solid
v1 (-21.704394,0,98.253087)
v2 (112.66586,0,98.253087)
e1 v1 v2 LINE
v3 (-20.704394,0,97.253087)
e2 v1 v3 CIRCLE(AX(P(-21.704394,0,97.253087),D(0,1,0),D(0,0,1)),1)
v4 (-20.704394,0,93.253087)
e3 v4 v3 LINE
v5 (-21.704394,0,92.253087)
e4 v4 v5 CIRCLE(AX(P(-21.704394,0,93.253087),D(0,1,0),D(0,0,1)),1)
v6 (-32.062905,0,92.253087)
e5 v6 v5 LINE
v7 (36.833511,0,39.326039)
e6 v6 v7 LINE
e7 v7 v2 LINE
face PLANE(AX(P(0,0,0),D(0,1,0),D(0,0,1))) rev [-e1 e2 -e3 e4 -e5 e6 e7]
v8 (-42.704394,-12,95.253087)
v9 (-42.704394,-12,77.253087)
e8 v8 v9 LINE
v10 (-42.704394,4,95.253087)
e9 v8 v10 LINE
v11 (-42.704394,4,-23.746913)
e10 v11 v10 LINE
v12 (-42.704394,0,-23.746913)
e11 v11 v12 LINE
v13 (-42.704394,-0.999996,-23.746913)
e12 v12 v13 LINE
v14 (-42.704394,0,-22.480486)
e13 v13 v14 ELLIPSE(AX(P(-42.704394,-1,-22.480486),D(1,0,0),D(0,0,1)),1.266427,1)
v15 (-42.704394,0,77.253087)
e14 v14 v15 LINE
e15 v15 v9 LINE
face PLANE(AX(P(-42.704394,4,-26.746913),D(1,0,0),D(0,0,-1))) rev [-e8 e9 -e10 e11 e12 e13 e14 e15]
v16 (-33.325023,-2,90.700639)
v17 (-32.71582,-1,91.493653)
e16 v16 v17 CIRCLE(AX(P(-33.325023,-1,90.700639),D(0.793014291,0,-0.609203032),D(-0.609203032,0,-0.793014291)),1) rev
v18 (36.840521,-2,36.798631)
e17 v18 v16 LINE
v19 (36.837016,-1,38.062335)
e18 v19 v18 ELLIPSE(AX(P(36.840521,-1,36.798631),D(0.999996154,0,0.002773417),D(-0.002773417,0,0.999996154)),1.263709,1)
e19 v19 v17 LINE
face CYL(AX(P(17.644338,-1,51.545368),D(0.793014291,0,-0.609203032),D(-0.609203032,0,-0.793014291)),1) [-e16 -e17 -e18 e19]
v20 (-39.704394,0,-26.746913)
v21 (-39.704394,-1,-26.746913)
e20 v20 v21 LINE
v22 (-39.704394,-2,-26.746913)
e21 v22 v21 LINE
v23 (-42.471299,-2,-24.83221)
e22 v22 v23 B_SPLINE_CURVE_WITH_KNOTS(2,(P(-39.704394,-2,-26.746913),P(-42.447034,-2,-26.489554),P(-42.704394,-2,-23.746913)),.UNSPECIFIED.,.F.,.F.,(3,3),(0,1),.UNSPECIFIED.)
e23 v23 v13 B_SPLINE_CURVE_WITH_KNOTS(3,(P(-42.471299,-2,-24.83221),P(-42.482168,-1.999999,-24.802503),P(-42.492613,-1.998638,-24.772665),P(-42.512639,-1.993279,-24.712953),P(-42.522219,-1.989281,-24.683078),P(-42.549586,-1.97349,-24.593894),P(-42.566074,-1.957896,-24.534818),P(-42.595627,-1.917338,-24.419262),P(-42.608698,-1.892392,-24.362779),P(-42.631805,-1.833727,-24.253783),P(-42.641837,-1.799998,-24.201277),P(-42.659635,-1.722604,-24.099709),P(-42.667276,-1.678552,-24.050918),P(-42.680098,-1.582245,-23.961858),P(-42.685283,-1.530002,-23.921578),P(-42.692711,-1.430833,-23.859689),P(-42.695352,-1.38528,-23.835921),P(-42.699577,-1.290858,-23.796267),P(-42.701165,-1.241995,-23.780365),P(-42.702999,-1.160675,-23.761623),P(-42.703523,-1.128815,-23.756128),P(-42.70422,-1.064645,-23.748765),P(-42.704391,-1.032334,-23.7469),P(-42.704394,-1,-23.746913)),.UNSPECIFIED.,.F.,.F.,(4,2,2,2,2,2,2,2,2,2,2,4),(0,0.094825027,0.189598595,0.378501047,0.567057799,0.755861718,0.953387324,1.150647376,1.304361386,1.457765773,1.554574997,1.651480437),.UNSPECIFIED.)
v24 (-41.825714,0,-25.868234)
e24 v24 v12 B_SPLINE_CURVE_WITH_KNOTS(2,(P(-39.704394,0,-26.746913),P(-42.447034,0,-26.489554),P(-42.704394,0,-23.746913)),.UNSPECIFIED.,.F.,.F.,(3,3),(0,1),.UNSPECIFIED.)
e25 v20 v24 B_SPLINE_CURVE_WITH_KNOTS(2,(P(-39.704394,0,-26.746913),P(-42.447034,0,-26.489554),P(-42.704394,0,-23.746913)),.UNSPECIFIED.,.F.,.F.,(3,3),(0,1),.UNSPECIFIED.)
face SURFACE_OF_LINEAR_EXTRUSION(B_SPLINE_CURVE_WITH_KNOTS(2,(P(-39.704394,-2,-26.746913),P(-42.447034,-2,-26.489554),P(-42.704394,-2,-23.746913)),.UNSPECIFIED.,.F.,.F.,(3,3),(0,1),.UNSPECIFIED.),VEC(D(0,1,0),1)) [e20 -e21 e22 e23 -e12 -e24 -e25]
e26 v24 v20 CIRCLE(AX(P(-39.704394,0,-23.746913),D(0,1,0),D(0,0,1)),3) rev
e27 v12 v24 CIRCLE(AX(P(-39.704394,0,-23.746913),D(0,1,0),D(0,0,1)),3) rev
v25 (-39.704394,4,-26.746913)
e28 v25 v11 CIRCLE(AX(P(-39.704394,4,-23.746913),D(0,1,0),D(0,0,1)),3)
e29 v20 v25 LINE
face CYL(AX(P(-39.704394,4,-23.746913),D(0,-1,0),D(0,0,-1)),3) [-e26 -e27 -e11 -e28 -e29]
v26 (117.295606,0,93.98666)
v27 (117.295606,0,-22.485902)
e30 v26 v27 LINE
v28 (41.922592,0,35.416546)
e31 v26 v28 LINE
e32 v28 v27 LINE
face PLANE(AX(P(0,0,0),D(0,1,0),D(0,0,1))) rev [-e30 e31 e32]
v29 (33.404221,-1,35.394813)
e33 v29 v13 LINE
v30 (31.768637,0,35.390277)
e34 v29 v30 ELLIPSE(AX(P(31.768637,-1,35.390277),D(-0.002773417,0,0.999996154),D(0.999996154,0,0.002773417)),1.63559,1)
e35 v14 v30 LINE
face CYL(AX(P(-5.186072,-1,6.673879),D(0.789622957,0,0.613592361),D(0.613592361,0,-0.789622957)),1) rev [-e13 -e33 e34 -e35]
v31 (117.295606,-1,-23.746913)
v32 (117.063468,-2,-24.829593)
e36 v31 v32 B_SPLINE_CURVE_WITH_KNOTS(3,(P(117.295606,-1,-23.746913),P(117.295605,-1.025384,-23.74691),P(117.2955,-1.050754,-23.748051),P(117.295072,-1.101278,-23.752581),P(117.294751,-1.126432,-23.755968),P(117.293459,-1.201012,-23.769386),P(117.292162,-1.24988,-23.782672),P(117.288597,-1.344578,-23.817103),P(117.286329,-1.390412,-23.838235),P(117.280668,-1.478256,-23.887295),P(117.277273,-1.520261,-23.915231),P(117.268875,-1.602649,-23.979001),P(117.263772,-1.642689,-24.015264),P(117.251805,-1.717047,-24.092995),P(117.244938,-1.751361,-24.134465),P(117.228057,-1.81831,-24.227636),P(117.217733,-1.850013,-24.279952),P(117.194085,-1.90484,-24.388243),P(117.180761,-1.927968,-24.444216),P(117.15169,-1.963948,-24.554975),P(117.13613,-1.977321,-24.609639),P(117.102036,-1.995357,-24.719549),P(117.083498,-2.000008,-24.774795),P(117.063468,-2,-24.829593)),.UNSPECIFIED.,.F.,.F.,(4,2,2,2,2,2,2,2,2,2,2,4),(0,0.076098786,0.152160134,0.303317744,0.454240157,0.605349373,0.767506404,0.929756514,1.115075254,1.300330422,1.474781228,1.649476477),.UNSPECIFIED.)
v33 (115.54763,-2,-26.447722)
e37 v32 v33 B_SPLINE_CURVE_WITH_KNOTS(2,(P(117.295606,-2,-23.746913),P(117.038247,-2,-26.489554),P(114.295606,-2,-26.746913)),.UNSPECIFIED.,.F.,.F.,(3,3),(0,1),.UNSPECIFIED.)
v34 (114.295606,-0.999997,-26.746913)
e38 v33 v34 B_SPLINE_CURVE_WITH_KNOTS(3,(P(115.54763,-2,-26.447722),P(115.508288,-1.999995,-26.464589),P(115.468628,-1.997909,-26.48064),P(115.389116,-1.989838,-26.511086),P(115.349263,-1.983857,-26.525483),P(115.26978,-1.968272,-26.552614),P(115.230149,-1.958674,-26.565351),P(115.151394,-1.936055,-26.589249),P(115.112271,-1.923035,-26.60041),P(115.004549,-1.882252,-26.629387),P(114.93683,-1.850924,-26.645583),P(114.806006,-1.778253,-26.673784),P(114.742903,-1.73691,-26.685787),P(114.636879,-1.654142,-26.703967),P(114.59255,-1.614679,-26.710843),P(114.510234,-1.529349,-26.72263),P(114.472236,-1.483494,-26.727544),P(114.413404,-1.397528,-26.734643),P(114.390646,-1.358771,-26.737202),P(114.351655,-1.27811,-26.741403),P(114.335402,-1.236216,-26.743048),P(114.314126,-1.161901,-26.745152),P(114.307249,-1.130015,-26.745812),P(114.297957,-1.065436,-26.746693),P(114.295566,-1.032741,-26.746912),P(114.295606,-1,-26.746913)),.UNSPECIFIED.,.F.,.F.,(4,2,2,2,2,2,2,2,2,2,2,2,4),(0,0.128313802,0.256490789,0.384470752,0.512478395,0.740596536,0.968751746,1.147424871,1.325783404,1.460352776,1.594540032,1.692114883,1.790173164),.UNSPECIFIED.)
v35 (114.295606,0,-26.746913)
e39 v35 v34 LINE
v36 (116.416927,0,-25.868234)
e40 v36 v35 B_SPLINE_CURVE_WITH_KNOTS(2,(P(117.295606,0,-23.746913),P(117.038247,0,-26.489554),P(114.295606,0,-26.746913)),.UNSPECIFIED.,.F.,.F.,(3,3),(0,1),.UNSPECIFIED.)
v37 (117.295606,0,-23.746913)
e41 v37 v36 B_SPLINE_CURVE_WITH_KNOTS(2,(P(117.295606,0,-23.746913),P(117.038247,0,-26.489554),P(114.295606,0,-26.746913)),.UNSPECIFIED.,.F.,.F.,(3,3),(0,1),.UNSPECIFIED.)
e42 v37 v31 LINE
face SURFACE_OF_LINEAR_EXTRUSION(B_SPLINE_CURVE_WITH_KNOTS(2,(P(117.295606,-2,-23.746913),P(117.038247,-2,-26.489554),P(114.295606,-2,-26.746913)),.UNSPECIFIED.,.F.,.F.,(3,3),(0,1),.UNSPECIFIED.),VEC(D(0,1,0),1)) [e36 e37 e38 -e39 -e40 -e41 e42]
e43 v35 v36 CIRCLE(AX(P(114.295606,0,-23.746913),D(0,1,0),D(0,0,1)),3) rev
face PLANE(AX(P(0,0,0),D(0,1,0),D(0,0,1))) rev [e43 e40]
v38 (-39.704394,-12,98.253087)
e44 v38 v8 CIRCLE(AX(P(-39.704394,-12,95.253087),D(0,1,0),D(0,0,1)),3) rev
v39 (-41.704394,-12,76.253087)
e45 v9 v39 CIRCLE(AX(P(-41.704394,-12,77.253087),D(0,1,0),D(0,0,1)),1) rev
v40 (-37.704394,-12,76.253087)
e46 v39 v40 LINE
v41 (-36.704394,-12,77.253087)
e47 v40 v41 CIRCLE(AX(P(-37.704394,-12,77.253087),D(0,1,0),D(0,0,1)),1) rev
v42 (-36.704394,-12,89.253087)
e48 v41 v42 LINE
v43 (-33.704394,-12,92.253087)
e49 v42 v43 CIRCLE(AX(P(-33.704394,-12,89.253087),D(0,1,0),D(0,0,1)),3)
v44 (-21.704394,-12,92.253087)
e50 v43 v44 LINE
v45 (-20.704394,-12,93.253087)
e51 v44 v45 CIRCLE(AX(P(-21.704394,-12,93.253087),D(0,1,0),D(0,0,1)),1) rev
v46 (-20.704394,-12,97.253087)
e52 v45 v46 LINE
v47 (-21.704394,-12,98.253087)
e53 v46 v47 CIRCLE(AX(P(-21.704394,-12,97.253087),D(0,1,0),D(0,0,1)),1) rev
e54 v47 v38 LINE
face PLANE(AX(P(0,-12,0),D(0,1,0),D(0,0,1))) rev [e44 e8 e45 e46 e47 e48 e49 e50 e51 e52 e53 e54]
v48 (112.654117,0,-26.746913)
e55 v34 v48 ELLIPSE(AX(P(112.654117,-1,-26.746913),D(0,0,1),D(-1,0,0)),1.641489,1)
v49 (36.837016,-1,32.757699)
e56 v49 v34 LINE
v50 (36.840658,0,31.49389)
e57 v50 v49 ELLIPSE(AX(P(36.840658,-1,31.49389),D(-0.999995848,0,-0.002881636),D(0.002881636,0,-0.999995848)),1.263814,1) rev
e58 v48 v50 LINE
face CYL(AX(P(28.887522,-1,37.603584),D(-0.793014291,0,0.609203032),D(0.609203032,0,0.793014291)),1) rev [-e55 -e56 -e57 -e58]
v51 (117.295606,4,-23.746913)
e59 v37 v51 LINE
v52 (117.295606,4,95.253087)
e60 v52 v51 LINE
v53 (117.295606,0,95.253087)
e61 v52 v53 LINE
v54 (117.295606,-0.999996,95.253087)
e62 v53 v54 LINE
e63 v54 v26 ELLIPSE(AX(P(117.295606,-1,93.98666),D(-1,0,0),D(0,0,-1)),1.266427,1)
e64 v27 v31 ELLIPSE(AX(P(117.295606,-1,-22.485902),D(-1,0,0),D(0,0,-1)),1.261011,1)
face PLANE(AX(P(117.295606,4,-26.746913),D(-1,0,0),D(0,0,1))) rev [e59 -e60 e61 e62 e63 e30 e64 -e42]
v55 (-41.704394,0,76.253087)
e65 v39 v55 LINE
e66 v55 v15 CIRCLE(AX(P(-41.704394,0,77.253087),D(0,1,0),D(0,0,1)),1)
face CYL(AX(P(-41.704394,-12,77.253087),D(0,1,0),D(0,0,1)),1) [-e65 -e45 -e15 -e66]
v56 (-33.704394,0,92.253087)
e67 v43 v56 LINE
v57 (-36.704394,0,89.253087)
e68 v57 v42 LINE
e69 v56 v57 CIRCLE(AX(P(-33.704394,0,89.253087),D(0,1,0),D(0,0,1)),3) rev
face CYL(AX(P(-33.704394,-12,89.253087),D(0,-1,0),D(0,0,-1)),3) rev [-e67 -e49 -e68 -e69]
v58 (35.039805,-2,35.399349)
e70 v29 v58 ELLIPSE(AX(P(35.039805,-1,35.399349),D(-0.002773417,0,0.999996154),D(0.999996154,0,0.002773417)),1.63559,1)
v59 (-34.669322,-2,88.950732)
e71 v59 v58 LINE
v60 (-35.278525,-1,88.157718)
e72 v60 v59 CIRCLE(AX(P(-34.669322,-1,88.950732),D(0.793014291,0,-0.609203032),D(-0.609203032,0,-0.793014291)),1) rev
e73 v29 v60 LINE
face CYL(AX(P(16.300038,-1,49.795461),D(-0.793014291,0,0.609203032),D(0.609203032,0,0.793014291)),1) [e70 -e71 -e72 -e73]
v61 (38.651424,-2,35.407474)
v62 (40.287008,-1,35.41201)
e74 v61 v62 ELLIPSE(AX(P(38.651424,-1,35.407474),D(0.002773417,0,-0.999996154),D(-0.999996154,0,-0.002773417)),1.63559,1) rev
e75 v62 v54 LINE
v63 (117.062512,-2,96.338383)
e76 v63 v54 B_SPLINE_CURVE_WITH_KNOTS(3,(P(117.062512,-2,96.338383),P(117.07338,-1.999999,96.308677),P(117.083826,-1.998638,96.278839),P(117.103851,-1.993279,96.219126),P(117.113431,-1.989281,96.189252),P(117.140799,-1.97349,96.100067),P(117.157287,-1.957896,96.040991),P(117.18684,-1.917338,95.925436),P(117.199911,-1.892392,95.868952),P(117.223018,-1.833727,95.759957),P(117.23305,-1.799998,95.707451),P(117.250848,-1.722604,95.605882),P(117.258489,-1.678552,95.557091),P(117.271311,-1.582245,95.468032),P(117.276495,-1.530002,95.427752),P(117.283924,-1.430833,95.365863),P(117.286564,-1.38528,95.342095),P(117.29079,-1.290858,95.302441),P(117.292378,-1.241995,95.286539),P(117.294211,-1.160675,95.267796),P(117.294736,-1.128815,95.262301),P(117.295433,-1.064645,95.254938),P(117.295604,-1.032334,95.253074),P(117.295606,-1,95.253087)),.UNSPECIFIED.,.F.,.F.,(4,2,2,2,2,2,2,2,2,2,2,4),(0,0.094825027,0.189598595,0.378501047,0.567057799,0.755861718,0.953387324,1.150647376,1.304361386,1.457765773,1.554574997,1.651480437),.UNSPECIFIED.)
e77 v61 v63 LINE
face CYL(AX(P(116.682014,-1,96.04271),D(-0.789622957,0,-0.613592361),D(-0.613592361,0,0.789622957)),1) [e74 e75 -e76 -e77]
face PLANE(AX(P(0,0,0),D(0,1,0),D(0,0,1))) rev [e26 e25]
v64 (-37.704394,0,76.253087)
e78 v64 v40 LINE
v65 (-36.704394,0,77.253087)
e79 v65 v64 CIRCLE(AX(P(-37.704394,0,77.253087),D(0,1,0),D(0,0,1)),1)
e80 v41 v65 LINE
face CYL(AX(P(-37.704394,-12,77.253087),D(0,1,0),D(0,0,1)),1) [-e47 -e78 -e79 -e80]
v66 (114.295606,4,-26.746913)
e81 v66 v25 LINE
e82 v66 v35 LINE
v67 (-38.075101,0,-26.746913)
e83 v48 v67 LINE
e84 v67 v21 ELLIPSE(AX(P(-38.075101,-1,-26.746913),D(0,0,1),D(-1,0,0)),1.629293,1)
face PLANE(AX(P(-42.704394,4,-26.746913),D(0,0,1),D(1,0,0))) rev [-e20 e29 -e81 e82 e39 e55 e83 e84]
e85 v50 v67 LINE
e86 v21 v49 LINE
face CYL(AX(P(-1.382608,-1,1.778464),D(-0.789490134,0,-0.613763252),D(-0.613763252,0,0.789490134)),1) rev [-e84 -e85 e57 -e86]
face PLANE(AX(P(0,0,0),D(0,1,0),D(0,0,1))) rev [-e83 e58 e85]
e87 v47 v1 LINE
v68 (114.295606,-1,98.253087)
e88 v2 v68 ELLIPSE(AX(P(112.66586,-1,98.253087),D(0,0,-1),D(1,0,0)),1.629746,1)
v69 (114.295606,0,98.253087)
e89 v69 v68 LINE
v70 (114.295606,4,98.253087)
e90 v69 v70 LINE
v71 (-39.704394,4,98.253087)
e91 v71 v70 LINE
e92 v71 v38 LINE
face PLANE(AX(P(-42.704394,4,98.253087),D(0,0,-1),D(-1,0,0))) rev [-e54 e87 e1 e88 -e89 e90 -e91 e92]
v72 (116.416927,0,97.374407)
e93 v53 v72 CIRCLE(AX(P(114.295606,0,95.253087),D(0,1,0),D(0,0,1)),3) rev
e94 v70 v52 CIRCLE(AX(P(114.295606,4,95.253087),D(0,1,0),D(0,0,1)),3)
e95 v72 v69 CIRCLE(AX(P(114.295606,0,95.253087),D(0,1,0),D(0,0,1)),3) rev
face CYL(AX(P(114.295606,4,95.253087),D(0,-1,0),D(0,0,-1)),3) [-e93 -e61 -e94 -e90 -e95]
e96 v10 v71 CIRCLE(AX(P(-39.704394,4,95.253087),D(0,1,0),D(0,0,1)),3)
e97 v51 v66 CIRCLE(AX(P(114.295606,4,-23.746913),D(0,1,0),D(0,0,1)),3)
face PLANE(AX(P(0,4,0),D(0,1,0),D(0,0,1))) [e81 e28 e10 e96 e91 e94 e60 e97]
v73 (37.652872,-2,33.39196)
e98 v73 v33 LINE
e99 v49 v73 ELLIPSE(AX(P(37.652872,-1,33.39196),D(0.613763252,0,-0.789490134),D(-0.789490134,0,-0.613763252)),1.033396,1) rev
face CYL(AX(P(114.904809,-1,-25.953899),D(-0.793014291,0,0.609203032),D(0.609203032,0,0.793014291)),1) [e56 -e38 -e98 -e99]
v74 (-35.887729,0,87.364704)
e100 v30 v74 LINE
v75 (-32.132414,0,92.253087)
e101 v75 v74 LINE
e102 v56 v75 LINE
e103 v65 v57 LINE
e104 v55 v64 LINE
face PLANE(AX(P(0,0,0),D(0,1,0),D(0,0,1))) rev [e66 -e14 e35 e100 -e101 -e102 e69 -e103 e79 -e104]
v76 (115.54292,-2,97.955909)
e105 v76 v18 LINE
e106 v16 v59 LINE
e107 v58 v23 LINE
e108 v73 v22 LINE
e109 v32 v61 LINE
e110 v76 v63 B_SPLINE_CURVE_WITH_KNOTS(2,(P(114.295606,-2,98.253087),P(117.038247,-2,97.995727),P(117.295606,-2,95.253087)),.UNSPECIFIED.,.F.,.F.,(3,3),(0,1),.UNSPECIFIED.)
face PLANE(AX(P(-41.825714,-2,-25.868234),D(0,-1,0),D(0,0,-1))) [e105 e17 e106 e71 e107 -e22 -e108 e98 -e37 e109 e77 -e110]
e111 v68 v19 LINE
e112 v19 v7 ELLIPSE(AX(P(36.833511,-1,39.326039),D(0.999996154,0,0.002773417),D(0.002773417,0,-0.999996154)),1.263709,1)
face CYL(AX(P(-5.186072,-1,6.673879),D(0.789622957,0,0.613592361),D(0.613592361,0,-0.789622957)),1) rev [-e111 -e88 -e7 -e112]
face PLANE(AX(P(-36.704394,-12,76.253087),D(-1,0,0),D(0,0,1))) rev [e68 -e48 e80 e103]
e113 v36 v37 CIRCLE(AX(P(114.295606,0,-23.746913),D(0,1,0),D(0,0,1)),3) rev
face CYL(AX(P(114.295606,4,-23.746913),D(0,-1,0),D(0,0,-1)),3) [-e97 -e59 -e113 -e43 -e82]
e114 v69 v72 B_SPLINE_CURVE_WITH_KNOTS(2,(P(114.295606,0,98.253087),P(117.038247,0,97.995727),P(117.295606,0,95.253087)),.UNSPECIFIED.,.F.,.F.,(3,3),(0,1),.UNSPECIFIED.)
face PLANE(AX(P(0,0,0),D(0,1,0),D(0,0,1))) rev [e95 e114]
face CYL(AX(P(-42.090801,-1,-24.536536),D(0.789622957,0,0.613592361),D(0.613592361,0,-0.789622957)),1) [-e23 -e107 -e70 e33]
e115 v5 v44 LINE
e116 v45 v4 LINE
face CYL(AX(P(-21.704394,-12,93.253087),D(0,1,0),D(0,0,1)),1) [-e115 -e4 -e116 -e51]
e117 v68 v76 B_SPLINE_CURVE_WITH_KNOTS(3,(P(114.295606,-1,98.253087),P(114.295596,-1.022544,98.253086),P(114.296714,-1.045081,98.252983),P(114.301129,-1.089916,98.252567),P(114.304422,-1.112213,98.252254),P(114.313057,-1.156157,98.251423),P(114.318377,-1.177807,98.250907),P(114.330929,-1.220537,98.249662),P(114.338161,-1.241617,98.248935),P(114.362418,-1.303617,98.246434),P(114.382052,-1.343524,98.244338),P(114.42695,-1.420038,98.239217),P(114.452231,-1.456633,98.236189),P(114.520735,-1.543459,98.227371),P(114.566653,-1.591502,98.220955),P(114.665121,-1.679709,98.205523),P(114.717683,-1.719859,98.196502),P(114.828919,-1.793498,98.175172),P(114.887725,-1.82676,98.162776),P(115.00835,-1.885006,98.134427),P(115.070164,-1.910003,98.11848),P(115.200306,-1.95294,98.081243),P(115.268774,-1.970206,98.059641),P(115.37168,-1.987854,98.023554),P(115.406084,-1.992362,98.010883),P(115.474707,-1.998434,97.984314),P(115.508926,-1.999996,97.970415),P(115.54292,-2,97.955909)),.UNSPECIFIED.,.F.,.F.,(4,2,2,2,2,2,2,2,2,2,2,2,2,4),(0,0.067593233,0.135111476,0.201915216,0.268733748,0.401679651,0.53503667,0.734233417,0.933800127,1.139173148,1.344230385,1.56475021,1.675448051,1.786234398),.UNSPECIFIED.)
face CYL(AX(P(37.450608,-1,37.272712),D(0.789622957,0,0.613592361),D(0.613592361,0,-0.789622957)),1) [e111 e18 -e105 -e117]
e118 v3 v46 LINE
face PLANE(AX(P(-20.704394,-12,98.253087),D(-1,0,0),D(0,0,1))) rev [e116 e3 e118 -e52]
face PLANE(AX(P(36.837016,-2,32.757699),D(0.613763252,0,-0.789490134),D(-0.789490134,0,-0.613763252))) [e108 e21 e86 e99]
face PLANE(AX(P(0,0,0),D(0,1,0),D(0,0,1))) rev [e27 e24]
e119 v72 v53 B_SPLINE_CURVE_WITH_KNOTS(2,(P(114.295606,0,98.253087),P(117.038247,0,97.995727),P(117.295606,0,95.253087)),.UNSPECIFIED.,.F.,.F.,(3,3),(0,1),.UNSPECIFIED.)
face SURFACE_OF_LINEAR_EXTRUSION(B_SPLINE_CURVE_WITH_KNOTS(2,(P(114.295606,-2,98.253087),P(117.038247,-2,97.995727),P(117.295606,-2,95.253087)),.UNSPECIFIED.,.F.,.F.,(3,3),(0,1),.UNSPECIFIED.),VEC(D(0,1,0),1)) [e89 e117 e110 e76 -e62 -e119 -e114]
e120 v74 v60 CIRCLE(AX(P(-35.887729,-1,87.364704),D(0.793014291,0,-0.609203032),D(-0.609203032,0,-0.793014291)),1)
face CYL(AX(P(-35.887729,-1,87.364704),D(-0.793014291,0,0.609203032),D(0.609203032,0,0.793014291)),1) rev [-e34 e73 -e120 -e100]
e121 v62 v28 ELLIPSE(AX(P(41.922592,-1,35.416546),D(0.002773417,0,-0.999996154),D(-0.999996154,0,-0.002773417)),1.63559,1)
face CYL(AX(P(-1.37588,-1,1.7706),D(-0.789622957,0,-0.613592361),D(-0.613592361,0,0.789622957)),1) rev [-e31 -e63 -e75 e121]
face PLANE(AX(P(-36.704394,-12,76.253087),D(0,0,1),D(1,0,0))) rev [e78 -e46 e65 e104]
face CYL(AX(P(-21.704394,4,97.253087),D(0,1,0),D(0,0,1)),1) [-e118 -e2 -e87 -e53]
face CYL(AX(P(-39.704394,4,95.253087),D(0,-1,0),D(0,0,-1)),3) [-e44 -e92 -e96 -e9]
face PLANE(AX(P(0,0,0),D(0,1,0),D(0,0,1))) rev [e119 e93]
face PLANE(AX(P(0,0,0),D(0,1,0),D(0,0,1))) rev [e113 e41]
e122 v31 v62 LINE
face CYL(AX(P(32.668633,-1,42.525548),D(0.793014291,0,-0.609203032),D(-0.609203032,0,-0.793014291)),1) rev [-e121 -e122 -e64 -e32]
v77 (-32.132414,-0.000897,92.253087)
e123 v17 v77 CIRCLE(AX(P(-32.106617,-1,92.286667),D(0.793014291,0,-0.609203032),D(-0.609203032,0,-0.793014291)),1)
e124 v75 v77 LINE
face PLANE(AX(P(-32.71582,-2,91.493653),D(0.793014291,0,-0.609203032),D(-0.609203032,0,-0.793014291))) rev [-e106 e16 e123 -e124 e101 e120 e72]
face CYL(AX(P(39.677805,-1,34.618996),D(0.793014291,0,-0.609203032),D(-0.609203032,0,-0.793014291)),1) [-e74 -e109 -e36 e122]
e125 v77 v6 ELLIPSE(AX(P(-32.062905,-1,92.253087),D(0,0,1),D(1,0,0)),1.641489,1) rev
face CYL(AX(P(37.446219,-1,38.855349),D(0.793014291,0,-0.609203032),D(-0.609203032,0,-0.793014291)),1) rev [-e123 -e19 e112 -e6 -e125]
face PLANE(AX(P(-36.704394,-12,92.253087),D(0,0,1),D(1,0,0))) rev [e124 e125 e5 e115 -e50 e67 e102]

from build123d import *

# Parameters (mm, degrees)
SKETCH_1_W       = 160
SKETCH_1_H       = 125
EXTRUDE_1_DEPTH  = 4
EXTRUDE_2_DEPTH  = 12
FILLET_7_R       = 1
FILLET_8_R       = 1
FILLET_9_R       = 3
FILLET_10_R      = 1
FILLET_11_R      = 1
FILLET_12_R      = 3
FILLET_13_R      = 3
EXTRUDE_10_DEPTH = 2
FILLET_14_R      = 1
FILLET_15_R      = 1
FILLET_16_R      = 1


# Some blends are built 0.0001 mm under size
with BuildPart() as part:
    # 草图1 → 凸台-拉伸1 (new body)
    with BuildSketch(Plane(origin=(0, 0, 0), x_dir=(1, 0, 0), z_dir=(0, 1, 0))):
        with Locations((37.295606337, -35.753086772)):
            Rectangle(SKETCH_1_W, SKETCH_1_H)
    extrude(amount=EXTRUDE_1_DEPTH)

    # 草图4 → 凸台-拉伸2 (add)
    with BuildSketch(Plane.XZ):
        Polygon((-42.704393663, 98.253086772), (-20.704393663, 98.253086772), (-20.704393663, 92.253086772), (-36.704393663, 92.253086772), (-36.704393663, 76.253086772), (-42.704393663, 76.253086772), align=None)
    extrude(amount=EXTRUDE_2_DEPTH)

    # 圆角7
    fillet_7_edges = [part.edges().sort_by_distance(p)[0] for p in [
        (-36.704393663, -6, 76.253086772),
    ]]
    fillet(fillet_7_edges, radius=FILLET_7_R)

    # 圆角8
    fillet_8_edges = [part.edges().sort_by_distance(p)[0] for p in [
        (-20.704393663, -6, 92.253086772),
    ]]
    fillet(fillet_8_edges, radius=FILLET_8_R)

    # 圆角9
    fillet_9_edges = [part.edges().sort_by_distance(p)[0] for p in [
        (-36.704393663, -6, 92.253086772),
    ]]
    fillet(fillet_9_edges, radius=FILLET_9_R)

    # 圆角10
    fillet_10_edges = [part.edges().sort_by_distance(p)[0] for p in [
        (-42.704393663, -6, 76.253086772),
    ]]
    fillet(fillet_10_edges, radius=FILLET_10_R)

    # 圆角11
    fillet_11_edges = [part.edges().sort_by_distance(p)[0] for p in [
        (-20.704393663, -6, 98.253086772),
    ]]
    fillet(fillet_11_edges, radius=FILLET_11_R)

    # 圆角12
    fillet_12_edges = [part.edges().sort_by_distance(p)[0] for p in [
        (-42.704393663, -4, 98.253086772),
    ]]
    fillet(fillet_12_edges, radius=FILLET_12_R)

    # 圆角13
    fillet_13_edges = [part.edges().sort_by_distance(p)[0] for p in [
        (-42.704393663, 2, -26.746913228),
        (117.295606337, 2, -26.746913228),
        (117.295606337, 2, 98.253086772),
    ]]
    fillet(fillet_13_edges, radius=FILLET_13_R)

    # 草图5 → 凸台-拉伸10 (add)
    with BuildSketch(Plane(origin=(0, 0, 0), x_dir=(-1, 0, 0), z_dir=(0, -1, 0))):
        with BuildLine():
            Line((-36.837015956, -38.062335011), (-114.295606337, -98.253086772))
            add(Edge.make_bspline(
                [(-114.295606337, -98.253086772), (-117.038247024, -97.995727459), (-117.295606337, -95.253086772)],
                knots=[0, 0, 0, 1, 1, 1], degree=2))
            Line((-117.295606337, -95.253086772), (-40.287007767, -35.412010176))
            Line((-40.287007767, -35.412010176), (-117.295606337, 23.746913228))
            add(Edge.make_bspline(
                [(-117.295606337, 23.746913228), (-117.038247024, 26.489553916), (-114.295606337, 26.746913228)],
                knots=[0, 0, 0, 1, 1, 1], degree=2))
            Line((-114.295606337, 26.746913228), (-36.837015956, -32.757699249))
            Line((-36.837015956, -32.757699249), (39.704393663, 26.746913228))
            add(Edge.make_bspline(
                [(39.704393663, 26.746913228), (42.44703435, 26.489553916), (42.704393663, 23.746913228)],
                knots=[0, 0, 0, 1, 1, 1], degree=2))
            Line((42.704393663, 23.746913228), (-33.404221285, -35.394813037))
            Line((-33.404221285, -35.394813037), (35.27852547, -88.157717828))
            Line((35.27852547, -88.157717828), (32.715820337, -91.493652958))
            Line((32.715820337, -91.493652958), (-36.837015956, -38.062335011))
        make_face()
    extrude(amount=EXTRUDE_10_DEPTH)

    # 圆角14
    fillet_14_edges = [part.edges().sort_by_distance(p)[0] for p in [
        (-0.937152093, -2, 61.776265433),
    ]]
    fillet(fillet_14_edges, radius=FILLET_14_R)

    # 圆角15
    # the kernel refuses this fillet: 1 mm, written as the material it adds along each edge
    with BuildSketch(Plane(origin=(119.269663729, 0, 96.787067675), x_dir=(0.6135923613981474, 0, -0.7896229568812227), z_dir=(-0.7896229568812227, 0, -0.6135923613981474))) as fillet_15_piece_1_section:
        with BuildLine():
            CenterArc((FILLET_15_R, FILLET_15_R), FILLET_15_R, 180, 90)
            Line((0, FILLET_15_R), (0, 0))
            Line((0, 0), (FILLET_15_R, 0))
        make_face()
    fillet_15_piece_1 = extrude(amount=102.525784805, mode=Mode.PRIVATE)
    fillet_15_piece_1 = split(fillet_15_piece_1, bisect_by=Plane(origin=(117.295606337, -0.053080032, 94.446500889), z_dir=(-1, 0, 0)), keep=Keep.TOP, mode=Mode.PRIVATE)
    add(fillet_15_piece_1)
    with BuildSketch(Plane(origin=(38.304472039, 0, 36.935017755), x_dir=(0, -1, 0), z_dir=(0.7930142912716122, 0, -0.6092030317053444))) as fillet_15_piece_2_section:
        with BuildLine():
            CenterArc((FILLET_15_R, -FILLET_15_R), FILLET_15_R, 90, 90)
            Line((0, -FILLET_15_R), (0, 0))
            Line((0, 0), (FILLET_15_R, 0))
        make_face()
    fillet_15_piece_2 = extrude(amount=102.108714707, mode=Mode.PRIVATE)
    fillet_15_piece_2 = split(fillet_15_piece_2, bisect_by=Plane(origin=(117.295606337, -0.053270407, -22.94652956), z_dir=(-1, 0, 0)), keep=Keep.TOP, mode=Mode.PRIVATE)
    add(fillet_15_piece_2)
    with BuildSketch(Plane(origin=(-32.715820337, 0, 91.493652958), x_dir=(0, -1, 0), z_dir=(0.793014291271612, 0, -0.6092030317053444))) as fillet_15_piece_3:
        with BuildLine():
            CenterArc((FILLET_15_R, -FILLET_15_R), FILLET_15_R, 90, 90)
            Line((0, -FILLET_15_R), (0, 0))
            Line((0, 0), (FILLET_15_R, 0))
        make_face()
    extrude(amount=90.206914061)
    with BuildSketch(Plane(origin=(34.862958564, 0, 36.528354107), x_dir=(0, -1, 0), z_dir=(0.7896229568812226, 0, 0.6135923613981475))) as fillet_15_piece_4_section:
        with BuildLine():
            CenterArc((FILLET_15_R, -FILLET_15_R), FILLET_15_R, 90, 90)
            Line((0, -FILLET_15_R), (0, 0))
            Line((0, 0), (FILLET_15_R, 0))
        make_face()
    fillet_15_piece_4 = extrude(amount=103.095666679, mode=Mode.PRIVATE)
    fillet_15_piece_4 = split(fillet_15_piece_4, bisect_by=Plane(origin=(74.167395997, -0.225483059, 98.253086772), z_dir=(0, 0, -1)), keep=Keep.TOP, mode=Mode.PRIVATE)
    add(fillet_15_piece_4)
    with BuildSketch(Plane(origin=(-44.678451055, 0, -25.280894132), x_dir=(0, -1, 0), z_dir=(0.7896229568812227, 0, 0.6135923613981475))) as fillet_15_piece_5_section:
        with BuildLine():
            CenterArc((FILLET_15_R, -FILLET_15_R), FILLET_15_R, 90, 90)
            Line((0, -FILLET_15_R), (0, 0))
            Line((0, 0), (FILLET_15_R, 0))
        make_face()
    fillet_15_piece_5 = extrude(amount=101.386021056, mode=Mode.PRIVATE)
    fillet_15_piece_5 = split(fillet_15_piece_5, bisect_by=Plane(origin=(-42.704393663, -0.053084467, -22.940328321), z_dir=(1, 0, 0)), keep=Keep.TOP, mode=Mode.PRIVATE)
    add(fillet_15_piece_5)
    with BuildSketch(Plane(origin=(38.81074129, 0, 34.292107378), x_dir=(0.6137632516185373, 0, -0.7894901335435676), z_dir=(-0.7894901335435676, 0, -0.6137632516185374))) as fillet_15_piece_6_section:
        with BuildLine():
            CenterArc((FILLET_15_R, FILLET_15_R), FILLET_15_R, 180, 90)
            Line((0, FILLET_15_R), (0, 0))
            Line((0, 0), (FILLET_15_R, 0))
        make_face()
    fillet_15_piece_6 = extrude(amount=101.950432143, mode=Mode.PRIVATE)
    fillet_15_piece_6 = split(fillet_15_piece_6, bisect_by=Plane(origin=(37.982564631, -0.229326287, -26.746913228), z_dir=(0, 0, 1)), keep=Keep.TOP, mode=Mode.PRIVATE)
    add(fillet_15_piece_6)
    with BuildSketch(Plane(origin=(116.278142065, 0, -28.269920808), x_dir=(-0.6092030317053443, 0, -0.793014291271612), z_dir=(-0.7930142912716122, 0, 0.6092030317053444))) as fillet_15_piece_7_section:
        with BuildLine():
            CenterArc((FILLET_15_R, FILLET_15_R), FILLET_15_R, 180, 90)
            Line((0, FILLET_15_R), (0, 0))
            Line((0, 0), (FILLET_15_R, 0))
        make_face()
    fillet_15_piece_7 = extrude(amount=102.676159475, mode=Mode.PRIVATE)
    fillet_15_piece_7 = split(fillet_15_piece_7, bisect_by=Plane(origin=(74.176619716, -0.225468871, -26.746913228), z_dir=(0, 0, 1)), keep=Keep.TOP, mode=Mode.PRIVATE)
    add(fillet_15_piece_7)
    with BuildSketch(Plane(origin=(35.386757013, 0, 33.871805457), x_dir=(-0.6092030317053444, 0, -0.7930142912716122), z_dir=(-0.7930142912716122, 0, 0.6092030317053444))) as fillet_15_piece_8:
        with BuildLine():
            CenterArc((FILLET_15_R, FILLET_15_R), FILLET_15_R, 180, 90)
            Line((0, FILLET_15_R), (0, 0))
            Line((0, 0), (FILLET_15_R, 0))
        make_face()
    extrude(amount=89.109721301)

    # 圆角16
    fillet_16_edges = [part.edges().sort_by_distance(p)[0] for p in [
        (75.566311147, -2, 3.00539301),
        (-4.242066379, -2, 6.141009884),
        (75.566311147, -2, 68.157710891),
        (78.791307052, -2, 65.332548474),
        (78.791307052, -2, 5.832548474),
        (2.06059781, -2, 64.777993985),
    ]]
    fillet(fillet_16_edges, radius=FILLET_16_R - 0.0001)  # a hair under: the kernel refuses the full size


solid = part.part
